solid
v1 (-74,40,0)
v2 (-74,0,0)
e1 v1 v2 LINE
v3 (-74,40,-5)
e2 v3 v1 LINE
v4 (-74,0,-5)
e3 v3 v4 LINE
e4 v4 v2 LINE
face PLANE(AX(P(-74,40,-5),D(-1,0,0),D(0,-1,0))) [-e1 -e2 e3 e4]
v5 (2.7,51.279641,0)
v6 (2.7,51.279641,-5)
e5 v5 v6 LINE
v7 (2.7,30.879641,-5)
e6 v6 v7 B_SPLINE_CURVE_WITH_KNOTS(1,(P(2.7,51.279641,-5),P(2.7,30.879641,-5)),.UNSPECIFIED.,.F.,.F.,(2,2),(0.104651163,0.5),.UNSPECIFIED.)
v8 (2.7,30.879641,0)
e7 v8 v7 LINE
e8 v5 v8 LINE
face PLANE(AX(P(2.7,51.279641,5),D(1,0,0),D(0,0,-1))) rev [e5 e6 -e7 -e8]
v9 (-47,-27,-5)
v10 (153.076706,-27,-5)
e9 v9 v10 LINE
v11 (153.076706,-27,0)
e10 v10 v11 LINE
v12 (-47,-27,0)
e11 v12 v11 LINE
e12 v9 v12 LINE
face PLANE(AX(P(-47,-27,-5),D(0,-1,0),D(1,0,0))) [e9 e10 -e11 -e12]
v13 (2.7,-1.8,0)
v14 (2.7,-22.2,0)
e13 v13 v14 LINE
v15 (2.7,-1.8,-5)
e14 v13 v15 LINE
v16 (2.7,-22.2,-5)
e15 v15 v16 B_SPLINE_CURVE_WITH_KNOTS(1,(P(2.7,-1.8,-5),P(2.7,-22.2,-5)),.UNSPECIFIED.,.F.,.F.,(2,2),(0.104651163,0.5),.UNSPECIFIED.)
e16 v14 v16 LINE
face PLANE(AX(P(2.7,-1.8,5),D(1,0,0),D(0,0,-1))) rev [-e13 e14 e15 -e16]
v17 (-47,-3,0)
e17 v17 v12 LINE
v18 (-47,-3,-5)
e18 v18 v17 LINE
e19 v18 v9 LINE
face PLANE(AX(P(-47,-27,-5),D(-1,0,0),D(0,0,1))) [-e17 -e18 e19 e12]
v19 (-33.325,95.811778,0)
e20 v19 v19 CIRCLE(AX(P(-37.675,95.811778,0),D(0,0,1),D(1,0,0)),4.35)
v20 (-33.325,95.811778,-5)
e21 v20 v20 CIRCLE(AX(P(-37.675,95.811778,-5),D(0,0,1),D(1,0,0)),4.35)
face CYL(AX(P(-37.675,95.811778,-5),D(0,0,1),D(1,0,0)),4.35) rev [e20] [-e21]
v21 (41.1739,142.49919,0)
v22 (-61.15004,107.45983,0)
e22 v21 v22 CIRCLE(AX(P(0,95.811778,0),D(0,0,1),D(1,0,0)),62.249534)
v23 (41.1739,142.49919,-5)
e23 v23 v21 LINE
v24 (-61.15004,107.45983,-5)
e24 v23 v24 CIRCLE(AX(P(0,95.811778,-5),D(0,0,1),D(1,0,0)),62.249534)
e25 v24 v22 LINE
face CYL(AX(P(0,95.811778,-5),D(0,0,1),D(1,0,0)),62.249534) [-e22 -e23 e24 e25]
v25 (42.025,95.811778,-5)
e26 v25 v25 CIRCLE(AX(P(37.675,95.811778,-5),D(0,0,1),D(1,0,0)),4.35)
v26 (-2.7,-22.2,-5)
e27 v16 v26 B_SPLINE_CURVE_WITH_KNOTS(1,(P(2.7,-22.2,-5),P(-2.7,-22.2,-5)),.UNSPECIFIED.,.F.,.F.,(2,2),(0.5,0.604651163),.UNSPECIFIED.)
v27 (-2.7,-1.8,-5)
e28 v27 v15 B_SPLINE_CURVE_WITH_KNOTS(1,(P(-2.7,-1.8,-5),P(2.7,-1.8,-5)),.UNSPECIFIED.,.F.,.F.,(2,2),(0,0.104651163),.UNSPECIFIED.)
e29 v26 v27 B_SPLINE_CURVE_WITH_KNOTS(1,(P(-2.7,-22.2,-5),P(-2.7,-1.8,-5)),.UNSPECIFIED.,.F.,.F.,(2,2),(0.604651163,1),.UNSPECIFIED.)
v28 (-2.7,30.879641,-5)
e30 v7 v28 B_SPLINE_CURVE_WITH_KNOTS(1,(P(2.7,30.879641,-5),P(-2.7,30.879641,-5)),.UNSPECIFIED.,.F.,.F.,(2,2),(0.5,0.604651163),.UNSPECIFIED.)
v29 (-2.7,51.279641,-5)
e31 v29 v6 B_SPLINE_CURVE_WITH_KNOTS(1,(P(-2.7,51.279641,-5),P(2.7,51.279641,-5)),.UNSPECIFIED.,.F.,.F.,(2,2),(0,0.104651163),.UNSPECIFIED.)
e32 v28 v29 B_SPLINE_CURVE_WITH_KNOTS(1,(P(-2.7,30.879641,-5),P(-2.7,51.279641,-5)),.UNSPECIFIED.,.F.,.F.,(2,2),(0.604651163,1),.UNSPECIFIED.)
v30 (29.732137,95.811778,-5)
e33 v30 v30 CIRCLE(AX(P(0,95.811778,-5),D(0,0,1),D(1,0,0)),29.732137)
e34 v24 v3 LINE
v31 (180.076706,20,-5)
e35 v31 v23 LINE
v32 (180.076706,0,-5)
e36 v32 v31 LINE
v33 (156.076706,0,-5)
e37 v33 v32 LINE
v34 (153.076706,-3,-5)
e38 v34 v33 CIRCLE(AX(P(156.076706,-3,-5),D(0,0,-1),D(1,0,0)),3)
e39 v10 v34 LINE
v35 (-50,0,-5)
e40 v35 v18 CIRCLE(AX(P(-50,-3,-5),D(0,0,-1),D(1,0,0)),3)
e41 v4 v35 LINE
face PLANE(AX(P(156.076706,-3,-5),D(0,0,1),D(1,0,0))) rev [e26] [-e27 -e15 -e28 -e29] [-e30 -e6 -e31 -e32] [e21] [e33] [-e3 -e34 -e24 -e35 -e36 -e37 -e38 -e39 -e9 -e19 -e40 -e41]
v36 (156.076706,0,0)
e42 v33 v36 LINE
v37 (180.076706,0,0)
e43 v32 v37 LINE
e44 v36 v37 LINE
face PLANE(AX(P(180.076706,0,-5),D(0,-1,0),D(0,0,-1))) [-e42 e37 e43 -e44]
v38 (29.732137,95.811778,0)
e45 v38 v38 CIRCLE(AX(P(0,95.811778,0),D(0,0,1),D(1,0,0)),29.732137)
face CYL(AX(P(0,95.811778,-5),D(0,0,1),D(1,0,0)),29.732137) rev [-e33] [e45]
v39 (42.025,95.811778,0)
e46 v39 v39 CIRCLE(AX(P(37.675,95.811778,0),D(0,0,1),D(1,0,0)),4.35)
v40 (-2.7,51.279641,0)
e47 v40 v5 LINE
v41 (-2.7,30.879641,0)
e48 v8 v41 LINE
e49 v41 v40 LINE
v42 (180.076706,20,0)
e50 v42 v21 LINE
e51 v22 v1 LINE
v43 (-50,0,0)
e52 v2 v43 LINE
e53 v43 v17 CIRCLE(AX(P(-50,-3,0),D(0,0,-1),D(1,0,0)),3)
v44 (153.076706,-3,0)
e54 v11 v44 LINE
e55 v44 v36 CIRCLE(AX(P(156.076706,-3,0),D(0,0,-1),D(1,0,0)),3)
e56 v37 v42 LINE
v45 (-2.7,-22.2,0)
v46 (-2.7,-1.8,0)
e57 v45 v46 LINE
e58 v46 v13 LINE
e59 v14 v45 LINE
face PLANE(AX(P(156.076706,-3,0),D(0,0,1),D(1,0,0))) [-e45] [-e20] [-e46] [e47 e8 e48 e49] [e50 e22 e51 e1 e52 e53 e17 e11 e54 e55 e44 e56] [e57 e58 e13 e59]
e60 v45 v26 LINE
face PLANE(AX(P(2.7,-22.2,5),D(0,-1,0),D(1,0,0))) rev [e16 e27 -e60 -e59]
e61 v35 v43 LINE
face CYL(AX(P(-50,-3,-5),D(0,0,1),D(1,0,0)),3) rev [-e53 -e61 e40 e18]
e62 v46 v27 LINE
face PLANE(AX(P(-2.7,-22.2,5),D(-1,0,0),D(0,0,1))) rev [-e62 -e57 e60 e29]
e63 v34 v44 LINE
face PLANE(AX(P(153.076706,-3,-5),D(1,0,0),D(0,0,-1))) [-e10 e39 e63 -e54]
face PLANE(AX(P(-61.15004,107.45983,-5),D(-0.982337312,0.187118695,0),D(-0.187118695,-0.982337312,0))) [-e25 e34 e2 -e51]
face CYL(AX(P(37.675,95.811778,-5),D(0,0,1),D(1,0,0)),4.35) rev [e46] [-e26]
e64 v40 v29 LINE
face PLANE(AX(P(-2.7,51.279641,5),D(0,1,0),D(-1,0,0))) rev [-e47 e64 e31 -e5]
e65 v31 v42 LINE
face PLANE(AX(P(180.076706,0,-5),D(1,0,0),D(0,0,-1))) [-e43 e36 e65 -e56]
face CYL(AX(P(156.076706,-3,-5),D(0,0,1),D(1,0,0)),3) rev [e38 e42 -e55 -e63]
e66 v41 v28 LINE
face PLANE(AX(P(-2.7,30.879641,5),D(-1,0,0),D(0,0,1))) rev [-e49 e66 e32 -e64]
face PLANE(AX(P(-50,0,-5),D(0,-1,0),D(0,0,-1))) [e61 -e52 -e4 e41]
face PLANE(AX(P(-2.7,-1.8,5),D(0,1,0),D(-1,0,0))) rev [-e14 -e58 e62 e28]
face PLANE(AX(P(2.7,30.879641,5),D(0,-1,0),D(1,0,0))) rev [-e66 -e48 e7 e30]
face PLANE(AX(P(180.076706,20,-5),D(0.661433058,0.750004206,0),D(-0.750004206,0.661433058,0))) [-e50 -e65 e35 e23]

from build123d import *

# Parameters (mm, degrees)
SKETCH_1_R             = 4.35
SKETCH_1_R_2           = 29.732137495
SM_BASE_FLANGE_1_DEPTH = 5
OTHER_START            = -2.7
OTHER_1_OUTLINE_W      = 20.4
OTHER_1_OUTLINE_H      = 5
OTHER_1_DEPTH          = 5.4


# Read off the part's stored shape, not the designer's step: Выступы и прорези-Прорезь1
# Sheet-metal steps are written as plain solids
with BuildPart() as part:
    # Sketch 1 → Базовая кромка1 (new body)
    with BuildSketch(Plane.XY):
        with BuildLine():
            Line((153.076706029, -3), (153.076706029, -27))
            Line((153.076706029, -27), (-47, -27))
            Line((-47, -27), (-47, -3))
            ThreePointArc((-47, -3), (-47.878679656, -0.878679656), (-50, 0))
            Line((-50, 0), (-74, 0))
            Line((-74, 0), (-74, 40))
            Line((-74, 40), (-61.150039911, 107.459829597))
            ThreePointArc((-61.150039911, 107.459829597), (-20.166822902, 154.704084341), (41.173899677, 142.499190395))
            Line((41.173899677, 142.499190395), (180.076706029, 20))
            Line((180.076706029, 20), (180.076706029, 0))
            Line((180.076706029, 0), (156.076706029, 0))
            ThreePointArc((156.076706029, 0), (153.955385686, -0.878679656), (153.076706029, -3))
        make_face()
        with Locations((-37.675, 95.811778053)):
            Circle(SKETCH_1_R, mode=Mode.SUBTRACT)
        with Locations((37.675, 95.811778053)):
            Circle(SKETCH_1_R, mode=Mode.SUBTRACT)
        with Locations((0, 95.811778053)):
            Circle(SKETCH_1_R_2, mode=Mode.SUBTRACT)
    extrude(amount=-SM_BASE_FLANGE_1_DEPTH)

    # Other 1 outline → Other 1 (cut)
    with BuildSketch(Plane.YZ.offset(OTHER_START)):
        with Locations((41.079640558, -2.5)):
            Rectangle(OTHER_1_OUTLINE_W, OTHER_1_OUTLINE_H)
        with Locations((-12, -2.5)):
            Rectangle(OTHER_1_OUTLINE_W, OTHER_1_OUTLINE_H)
    extrude(amount=OTHER_1_DEPTH, mode=Mode.SUBTRACT)


solid = part.part
